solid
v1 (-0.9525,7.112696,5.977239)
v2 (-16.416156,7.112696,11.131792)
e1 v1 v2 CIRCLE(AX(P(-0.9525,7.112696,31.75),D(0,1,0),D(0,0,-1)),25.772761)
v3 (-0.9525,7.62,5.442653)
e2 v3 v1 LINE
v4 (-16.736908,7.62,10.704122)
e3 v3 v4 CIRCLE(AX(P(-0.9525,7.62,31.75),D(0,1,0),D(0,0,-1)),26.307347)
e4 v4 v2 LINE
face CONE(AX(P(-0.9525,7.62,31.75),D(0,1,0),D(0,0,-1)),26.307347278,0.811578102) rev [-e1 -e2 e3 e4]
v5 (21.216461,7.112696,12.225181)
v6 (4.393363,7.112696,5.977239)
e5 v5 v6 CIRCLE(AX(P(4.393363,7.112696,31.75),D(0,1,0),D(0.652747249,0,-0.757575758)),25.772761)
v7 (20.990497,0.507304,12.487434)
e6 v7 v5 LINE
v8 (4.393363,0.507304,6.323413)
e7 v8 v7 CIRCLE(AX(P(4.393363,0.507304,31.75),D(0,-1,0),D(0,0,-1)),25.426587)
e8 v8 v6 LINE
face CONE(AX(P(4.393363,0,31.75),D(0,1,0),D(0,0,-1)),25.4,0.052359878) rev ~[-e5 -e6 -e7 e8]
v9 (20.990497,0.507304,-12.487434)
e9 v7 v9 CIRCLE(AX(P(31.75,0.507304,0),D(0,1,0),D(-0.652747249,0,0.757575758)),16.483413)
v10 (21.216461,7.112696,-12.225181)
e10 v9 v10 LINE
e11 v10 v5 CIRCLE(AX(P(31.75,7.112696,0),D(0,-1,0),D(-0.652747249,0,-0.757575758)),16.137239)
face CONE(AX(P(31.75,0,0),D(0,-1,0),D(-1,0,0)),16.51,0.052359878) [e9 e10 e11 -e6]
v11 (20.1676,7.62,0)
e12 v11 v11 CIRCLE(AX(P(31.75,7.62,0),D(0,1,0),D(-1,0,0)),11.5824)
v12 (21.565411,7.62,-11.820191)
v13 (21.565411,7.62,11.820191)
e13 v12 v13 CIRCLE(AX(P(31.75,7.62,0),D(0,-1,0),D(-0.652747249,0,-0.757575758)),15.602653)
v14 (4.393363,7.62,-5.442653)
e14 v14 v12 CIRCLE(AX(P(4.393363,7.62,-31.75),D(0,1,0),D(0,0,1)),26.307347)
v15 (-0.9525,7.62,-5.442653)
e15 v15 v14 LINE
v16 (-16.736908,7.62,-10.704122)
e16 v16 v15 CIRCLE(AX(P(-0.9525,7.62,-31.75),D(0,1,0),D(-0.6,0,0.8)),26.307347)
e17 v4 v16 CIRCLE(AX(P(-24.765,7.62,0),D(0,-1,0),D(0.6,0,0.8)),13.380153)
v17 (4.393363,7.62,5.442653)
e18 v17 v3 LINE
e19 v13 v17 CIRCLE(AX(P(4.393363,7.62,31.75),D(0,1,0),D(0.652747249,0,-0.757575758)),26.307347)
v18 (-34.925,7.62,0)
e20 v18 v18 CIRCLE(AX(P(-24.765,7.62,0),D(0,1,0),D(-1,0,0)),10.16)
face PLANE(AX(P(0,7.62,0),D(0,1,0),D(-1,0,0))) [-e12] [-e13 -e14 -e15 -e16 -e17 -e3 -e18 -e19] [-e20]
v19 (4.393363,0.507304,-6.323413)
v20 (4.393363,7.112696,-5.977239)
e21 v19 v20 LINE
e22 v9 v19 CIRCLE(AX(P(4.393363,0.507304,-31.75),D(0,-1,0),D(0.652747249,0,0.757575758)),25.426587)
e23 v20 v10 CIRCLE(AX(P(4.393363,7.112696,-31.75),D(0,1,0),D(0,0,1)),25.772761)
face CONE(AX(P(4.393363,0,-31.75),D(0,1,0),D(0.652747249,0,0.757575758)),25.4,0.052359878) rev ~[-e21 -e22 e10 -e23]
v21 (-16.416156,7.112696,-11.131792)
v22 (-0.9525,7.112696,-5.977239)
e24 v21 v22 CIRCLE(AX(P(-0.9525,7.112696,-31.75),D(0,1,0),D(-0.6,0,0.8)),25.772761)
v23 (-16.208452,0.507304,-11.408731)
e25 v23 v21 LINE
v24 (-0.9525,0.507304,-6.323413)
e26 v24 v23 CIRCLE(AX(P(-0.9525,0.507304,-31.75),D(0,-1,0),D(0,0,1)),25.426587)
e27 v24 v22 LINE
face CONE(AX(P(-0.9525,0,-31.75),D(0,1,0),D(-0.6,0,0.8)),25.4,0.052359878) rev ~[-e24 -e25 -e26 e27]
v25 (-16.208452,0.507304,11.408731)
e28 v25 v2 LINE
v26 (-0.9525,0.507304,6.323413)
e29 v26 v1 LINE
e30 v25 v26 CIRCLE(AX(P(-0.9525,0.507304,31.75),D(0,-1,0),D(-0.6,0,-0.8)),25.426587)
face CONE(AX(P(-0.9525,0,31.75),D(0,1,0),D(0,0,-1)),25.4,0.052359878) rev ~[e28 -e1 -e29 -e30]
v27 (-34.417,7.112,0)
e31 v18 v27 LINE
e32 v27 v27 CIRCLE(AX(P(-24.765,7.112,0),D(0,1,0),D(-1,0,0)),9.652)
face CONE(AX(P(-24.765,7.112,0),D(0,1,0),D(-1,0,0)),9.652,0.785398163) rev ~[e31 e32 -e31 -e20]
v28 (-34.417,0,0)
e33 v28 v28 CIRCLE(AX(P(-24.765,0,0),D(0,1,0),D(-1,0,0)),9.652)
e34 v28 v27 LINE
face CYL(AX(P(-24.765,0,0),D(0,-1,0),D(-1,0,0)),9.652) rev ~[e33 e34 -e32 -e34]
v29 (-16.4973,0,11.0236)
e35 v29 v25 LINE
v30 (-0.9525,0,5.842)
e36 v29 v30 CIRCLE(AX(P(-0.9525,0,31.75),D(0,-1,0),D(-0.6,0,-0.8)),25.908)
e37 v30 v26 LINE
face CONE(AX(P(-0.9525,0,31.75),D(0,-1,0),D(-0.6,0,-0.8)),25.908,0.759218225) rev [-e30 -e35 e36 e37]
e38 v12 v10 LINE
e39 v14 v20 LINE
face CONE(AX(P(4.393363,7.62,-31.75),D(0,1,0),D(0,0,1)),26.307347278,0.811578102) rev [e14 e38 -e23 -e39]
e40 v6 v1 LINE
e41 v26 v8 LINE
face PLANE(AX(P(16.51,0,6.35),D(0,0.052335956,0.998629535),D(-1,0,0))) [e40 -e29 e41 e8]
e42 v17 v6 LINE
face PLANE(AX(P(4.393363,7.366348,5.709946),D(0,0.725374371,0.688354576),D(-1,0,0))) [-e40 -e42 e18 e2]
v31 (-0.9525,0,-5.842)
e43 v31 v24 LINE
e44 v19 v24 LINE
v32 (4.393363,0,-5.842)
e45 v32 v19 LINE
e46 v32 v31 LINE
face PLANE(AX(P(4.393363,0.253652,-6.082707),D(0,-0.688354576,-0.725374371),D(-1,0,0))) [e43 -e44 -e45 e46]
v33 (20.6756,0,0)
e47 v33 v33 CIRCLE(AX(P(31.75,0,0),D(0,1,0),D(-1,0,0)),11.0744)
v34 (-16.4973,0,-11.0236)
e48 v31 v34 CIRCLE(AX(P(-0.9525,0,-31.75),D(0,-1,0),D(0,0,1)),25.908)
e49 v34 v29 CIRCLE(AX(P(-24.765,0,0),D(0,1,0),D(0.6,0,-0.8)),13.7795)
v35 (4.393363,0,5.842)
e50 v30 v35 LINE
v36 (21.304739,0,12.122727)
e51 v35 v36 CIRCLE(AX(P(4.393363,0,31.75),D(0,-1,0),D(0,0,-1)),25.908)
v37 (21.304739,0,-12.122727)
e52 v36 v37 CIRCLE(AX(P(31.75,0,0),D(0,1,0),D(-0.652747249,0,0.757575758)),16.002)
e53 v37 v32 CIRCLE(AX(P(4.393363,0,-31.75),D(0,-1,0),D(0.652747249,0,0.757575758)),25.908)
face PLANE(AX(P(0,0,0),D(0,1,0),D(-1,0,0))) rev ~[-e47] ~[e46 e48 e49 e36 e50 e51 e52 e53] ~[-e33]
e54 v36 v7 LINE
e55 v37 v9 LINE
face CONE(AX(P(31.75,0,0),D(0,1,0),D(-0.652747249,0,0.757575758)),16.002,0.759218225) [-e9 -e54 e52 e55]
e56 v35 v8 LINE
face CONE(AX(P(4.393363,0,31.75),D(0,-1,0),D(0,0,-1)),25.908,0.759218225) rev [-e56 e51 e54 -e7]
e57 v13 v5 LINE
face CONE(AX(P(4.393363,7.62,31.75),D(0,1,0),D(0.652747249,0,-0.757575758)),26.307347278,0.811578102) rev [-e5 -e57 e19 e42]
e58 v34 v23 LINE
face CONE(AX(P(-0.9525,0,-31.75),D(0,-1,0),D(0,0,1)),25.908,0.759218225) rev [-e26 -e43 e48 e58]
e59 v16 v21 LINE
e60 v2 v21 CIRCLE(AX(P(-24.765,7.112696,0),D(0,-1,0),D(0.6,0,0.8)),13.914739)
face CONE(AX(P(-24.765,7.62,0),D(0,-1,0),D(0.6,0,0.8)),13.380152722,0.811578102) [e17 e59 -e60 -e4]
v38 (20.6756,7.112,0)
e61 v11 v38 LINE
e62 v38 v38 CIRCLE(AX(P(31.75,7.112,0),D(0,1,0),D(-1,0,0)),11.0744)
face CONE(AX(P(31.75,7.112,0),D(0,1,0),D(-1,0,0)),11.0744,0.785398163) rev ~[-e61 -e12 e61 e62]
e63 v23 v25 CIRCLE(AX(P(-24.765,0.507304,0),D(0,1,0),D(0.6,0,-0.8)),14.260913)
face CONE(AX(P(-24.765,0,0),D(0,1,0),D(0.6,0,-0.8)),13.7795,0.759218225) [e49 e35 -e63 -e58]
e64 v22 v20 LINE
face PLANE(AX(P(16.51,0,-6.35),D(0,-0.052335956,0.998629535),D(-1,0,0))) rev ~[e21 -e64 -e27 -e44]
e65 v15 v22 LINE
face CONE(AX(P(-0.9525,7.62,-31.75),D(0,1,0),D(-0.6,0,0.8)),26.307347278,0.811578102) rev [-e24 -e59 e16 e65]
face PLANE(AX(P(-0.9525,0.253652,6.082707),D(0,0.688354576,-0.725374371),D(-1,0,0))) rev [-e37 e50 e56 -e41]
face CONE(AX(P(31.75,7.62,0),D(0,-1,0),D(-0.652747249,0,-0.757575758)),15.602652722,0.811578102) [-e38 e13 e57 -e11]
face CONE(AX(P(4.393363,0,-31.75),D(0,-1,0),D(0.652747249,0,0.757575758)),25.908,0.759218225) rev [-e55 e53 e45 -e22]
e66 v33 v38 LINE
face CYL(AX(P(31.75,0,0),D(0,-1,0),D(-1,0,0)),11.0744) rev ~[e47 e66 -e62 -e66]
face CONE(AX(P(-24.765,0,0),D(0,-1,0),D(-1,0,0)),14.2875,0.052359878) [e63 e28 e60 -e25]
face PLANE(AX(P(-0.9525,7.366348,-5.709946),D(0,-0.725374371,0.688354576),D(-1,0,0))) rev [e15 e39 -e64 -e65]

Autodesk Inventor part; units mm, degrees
ref_plane "YZ Plane" through (0, 0, 0) normal (1, 0, 0) x (0, 1, 0)
ref_plane "XZ Plane" through (0, 0, 0) normal (0, 1, 0) x (-1, 0, 0)
ref_plane "XY Plane" through (0, 0, 0) normal (0, 0, 1) x (1, 0, 0)
sketch "Sketch1" plane through (0, 0, 0) normal (0, 1, 0) x (-1, 0, 0)
  circle A0 centre (-31.75, 0) radius 11.0744
  circle A1 centre (24.765, 0) radius 9.652
  line L0 (-16.51, -6.35) -> (11.9662, -6.35)
  circle A2 centre (24.765, 0) radius 14.2875
  circle A3 centre (-31.75, 0) radius 16.51
  line L1 (-16.51, 6.35) -> (11.9662, 6.35)
  point P0 (0, 0)
  dimension "d15" = 22.1488
  dimension "d17" = 12.7
  dimension "d18" = 33.02
  dimension "d19" = 19.304
  dimension "d20" = 28.575
  dimension "d21" = 56.515
extrude "Extrusion2" add sketch "Sketch1" along normal blind 7.62
fillet "Fillet3" radius 25.4 4 edges at (-11.9662, 3.81, 6.35) (-11.9662, 3.81, -6.35) (16.51, 3.81, -6.35) (16.51, 3.81, 6.35)
draft "FaceDraft2" angle 3 pull direction (0, 1, 0) faces at (41.7415, 5.08, -13.1435) (14.1702, 2.54, 8.307) (8.391, 2.54, -6.6666) (0.8295, 2.54, 6.35) (2.6114, 2.54, -6.35) (-2.7671, 2.54, 6.4149) (-4.5723, 2.54, -6.6093) (-18.1739, 5.08, 12.6764) fixed edges at (48.26, 0, 0) (13.2365, 0, 7.9391) (13.2365, 0, -7.9391) (1.7204, 0, 6.35) (1.7204, 0, -6.35) (-8.9847, 0, 7.6534) (-8.9847, 0, -7.6534) (-39.0525, 0, 0)
chamfer "Chamfer1" distance 0.508 angle 45 6 edges at (-38.6532, 7.62, 0) (1.7204, 7.62, -5.9507) (1.7204, 7.62, 5.9507) (47.8607, 7.62, 0) (42.8244, 7.62, 0) (-15.113, 7.62, 0)
chamfer "Chamfer2" distance 0.508 angle 45 4 edges at (-39.0525, 0, 0) (1.7204, 0, -6.35) (1.7204, 0, 6.35) (48.26, 0, 0)
properties part number "Connecting Rod"
